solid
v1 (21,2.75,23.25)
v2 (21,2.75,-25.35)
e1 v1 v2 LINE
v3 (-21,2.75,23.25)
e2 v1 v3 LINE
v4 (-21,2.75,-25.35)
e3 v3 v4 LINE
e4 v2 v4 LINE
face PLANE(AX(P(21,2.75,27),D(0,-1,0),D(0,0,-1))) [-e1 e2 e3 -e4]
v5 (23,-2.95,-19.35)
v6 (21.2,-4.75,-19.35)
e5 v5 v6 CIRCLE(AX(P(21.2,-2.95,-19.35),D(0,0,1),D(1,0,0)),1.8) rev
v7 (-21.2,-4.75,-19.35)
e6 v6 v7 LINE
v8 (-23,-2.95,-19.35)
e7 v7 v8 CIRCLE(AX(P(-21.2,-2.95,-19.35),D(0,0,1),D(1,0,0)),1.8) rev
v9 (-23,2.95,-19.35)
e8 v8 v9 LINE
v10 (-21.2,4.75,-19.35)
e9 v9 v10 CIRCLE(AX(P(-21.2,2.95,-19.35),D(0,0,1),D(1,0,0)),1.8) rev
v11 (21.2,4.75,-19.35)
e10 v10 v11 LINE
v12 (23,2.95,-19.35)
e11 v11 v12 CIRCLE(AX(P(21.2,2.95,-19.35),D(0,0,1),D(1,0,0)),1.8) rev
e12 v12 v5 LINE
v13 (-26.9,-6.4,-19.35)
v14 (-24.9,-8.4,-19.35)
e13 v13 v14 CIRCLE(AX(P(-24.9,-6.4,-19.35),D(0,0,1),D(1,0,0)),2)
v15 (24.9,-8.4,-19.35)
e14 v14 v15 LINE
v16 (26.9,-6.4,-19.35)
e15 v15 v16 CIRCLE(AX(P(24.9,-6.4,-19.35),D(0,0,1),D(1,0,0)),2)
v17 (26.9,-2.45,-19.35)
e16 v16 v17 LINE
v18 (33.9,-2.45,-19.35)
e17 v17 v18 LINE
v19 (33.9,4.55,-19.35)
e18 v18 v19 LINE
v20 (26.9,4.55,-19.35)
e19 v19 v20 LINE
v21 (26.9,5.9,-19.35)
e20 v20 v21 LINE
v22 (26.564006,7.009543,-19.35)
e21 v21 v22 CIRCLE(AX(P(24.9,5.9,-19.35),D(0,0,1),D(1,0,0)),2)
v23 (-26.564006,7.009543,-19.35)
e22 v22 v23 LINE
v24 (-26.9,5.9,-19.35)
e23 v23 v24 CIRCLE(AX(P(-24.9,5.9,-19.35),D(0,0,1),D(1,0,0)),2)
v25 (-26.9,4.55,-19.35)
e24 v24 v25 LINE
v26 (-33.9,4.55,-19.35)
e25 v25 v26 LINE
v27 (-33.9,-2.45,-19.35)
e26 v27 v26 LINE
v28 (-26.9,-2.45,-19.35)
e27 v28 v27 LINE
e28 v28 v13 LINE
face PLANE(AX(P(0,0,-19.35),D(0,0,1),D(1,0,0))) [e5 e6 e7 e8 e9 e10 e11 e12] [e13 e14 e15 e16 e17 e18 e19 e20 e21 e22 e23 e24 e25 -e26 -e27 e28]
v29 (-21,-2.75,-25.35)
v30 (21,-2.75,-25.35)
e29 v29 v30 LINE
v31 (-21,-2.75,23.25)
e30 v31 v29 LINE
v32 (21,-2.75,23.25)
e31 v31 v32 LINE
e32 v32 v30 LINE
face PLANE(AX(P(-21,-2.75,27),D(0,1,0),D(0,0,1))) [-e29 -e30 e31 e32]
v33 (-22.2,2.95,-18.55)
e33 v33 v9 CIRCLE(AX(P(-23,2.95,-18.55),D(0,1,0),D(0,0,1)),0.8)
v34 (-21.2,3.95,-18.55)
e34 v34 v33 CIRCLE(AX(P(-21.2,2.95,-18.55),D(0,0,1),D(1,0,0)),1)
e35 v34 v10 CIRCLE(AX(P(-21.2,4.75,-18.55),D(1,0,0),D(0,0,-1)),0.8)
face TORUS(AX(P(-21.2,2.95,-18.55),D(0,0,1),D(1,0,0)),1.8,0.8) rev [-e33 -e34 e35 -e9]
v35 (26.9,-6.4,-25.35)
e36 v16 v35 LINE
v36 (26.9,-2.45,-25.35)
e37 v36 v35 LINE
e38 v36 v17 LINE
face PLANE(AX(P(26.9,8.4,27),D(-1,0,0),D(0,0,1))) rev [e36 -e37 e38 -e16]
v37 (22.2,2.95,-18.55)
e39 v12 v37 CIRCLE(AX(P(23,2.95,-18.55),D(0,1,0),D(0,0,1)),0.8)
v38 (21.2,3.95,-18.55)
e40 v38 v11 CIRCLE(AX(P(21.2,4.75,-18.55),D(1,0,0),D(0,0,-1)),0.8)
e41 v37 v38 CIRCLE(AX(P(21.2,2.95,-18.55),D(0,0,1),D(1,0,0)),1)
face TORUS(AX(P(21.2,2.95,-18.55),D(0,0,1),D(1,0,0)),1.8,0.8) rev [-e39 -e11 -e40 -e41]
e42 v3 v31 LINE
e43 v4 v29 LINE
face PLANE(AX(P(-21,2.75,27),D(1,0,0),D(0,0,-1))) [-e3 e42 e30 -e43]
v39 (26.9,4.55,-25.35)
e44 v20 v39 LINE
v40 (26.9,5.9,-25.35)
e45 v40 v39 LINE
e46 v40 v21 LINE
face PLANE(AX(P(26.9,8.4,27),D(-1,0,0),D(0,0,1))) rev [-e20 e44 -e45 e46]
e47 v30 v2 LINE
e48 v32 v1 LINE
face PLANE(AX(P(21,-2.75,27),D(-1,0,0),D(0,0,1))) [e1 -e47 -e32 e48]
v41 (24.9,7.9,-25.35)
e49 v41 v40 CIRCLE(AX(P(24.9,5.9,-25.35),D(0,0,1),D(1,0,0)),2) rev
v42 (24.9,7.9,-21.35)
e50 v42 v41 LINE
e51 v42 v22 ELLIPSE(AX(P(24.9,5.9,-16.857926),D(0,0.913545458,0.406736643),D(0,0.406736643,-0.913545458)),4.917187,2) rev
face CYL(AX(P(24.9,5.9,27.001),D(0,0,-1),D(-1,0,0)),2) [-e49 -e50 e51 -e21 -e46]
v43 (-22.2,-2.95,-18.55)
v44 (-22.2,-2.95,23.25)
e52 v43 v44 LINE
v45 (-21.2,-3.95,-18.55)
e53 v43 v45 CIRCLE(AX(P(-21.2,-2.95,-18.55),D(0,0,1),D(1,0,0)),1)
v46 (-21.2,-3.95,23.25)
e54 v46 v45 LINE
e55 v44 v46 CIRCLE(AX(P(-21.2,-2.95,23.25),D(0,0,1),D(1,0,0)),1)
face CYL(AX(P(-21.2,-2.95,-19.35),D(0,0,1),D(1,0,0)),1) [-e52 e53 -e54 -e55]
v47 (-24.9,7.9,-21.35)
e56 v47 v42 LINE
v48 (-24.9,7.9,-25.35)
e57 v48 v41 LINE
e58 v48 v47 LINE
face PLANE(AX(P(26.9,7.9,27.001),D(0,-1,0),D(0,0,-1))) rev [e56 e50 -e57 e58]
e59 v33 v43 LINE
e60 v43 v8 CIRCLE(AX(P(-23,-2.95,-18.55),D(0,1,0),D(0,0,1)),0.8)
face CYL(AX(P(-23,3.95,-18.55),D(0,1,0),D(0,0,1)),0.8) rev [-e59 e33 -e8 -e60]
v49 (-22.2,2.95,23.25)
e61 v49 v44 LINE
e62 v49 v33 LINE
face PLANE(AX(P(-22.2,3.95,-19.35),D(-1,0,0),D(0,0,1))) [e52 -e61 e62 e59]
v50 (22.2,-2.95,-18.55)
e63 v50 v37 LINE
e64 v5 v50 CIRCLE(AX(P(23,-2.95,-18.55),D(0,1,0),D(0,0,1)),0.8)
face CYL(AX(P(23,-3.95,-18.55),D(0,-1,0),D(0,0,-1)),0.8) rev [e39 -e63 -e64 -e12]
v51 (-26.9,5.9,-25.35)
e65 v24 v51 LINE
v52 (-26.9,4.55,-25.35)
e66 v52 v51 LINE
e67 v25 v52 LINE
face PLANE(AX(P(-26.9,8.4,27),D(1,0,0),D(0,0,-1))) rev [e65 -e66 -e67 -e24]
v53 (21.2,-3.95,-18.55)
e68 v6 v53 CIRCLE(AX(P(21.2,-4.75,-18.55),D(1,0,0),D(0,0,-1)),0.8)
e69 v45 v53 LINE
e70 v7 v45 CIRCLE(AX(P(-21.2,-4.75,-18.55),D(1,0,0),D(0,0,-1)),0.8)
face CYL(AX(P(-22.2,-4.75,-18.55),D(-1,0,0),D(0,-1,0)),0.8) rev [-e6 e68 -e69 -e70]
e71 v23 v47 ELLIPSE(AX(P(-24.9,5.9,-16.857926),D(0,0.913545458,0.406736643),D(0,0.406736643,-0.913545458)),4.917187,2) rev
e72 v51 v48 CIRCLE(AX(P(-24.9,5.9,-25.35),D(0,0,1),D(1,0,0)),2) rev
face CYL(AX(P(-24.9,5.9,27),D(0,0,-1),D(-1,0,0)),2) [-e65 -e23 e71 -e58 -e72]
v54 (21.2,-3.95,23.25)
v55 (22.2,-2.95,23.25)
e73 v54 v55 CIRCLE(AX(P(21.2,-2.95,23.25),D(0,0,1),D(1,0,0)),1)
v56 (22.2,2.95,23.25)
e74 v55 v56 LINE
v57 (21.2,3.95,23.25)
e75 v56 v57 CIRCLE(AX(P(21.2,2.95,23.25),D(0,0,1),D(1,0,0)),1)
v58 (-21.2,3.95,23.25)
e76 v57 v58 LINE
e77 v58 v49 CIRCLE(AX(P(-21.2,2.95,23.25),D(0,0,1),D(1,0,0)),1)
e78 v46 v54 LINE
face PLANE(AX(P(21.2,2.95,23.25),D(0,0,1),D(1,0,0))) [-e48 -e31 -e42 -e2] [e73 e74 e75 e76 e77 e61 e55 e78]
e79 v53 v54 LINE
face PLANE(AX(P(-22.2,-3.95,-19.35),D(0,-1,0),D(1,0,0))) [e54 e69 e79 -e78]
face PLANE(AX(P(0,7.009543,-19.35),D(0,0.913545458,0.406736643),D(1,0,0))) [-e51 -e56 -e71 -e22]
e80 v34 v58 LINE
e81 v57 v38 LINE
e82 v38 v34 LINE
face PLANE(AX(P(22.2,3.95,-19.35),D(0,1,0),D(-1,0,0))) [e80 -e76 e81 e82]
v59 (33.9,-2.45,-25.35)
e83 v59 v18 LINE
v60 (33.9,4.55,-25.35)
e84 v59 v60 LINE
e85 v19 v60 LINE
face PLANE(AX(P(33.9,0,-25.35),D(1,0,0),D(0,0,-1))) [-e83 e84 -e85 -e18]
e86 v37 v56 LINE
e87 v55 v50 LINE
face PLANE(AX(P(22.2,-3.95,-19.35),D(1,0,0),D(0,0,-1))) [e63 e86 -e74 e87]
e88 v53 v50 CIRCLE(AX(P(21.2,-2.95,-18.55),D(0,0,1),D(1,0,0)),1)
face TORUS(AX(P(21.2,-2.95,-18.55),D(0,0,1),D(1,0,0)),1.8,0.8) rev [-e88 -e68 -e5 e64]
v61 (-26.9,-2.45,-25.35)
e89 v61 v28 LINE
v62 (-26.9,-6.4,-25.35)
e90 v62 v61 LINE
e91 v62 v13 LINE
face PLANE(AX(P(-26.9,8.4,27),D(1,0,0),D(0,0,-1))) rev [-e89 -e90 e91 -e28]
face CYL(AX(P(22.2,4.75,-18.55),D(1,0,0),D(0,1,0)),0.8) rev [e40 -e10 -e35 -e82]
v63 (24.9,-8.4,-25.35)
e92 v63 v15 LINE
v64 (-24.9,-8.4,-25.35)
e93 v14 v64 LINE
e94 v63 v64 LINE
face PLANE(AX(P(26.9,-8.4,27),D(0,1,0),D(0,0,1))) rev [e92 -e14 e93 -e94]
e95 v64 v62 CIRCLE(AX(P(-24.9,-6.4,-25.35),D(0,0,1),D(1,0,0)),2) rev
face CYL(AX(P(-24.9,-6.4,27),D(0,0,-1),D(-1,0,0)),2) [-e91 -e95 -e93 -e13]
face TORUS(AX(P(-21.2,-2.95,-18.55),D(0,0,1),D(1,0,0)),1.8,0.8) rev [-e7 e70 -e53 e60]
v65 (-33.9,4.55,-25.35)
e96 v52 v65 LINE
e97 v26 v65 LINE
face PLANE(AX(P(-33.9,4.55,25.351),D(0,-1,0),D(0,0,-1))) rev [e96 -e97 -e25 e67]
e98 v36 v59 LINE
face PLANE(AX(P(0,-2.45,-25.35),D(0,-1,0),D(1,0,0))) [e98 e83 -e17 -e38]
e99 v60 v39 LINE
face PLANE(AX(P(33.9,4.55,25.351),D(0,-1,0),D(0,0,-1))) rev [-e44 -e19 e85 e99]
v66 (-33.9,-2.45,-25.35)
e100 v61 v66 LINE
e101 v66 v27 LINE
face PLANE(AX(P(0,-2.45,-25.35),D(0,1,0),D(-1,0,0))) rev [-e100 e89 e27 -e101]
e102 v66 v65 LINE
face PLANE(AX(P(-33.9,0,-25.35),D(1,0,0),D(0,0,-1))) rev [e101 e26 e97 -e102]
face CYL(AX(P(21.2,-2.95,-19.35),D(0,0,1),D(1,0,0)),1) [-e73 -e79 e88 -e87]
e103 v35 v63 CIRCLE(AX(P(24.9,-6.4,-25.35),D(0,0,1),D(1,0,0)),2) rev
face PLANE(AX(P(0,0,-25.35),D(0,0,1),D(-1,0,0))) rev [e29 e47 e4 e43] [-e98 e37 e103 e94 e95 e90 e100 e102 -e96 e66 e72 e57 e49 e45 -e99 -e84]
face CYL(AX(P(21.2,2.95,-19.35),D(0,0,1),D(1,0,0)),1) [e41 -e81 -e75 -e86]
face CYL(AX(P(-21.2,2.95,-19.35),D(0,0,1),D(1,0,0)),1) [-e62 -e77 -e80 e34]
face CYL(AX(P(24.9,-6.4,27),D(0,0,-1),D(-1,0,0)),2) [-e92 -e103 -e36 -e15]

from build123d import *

# Parameters (mm, degrees)
SKETCH1_W           = 53.8
SKETCH1_H           = 16.8
SKETCH1_W_2         = 42
SKETCH1_H_2         = 5.5
BOSS_EXTRUDE1_DEPTH = 27
SKETCH4_W           = 53.8
SKETCH4_H           = 16.8
SKETCH4_W_2         = 44.4
SKETCH4_H_2         = 7.9
CUT_EXTRUDE2_DEPTH  = 19.35
SKETCH2_W           = 7
SKETCH2_H           = 10
BOSS_EXTRUDE2_DEPTH = 6
SKETCH3_R           = 1.35
CUT_EXTRUDE1_DEPTH  = 8
CUT_EXTRUDE4_REACH  = 66.31
SKETCH7_W           = 53.8
SKETCH7_H           = 0.5
FILLET2_R           = 1
FILETE1_R           = 2
SKETCH5_W           = 53.8
SKETCH5_H           = 16.8
CUT_EXTRUDE3_DEPTH  = 1.65
CUT_EXTRUDE5_REACH  = 63.565
CUT_EXTRUDE6_REACH  = 64.931
BOSS_EXTRUDE3_START = -7
SKETCH10_R          = 1.35
BOSS_EXTRUDE3_DEPTH = 7
CUT_EXTRUDE7_DEPTH  = 1.65
SKETCH13_W          = 6
SKETCH13_H          = 16.8
CUT_EXTRUDE8_DEPTH  = 73.869901194
FILLET6_R           = 0.8
BOSS_EXTRUDE4_START = 3.9
SKETCH14_W          = 42
SKETCH14_H          = 5.5
BOSS_EXTRUDE4_DEPTH = 3.9


with BuildPart() as part:
    # Sketch1 → Boss-Extrude1 (new, symmetric)
    with BuildSketch(Plane.XY):
        Rectangle(SKETCH1_W, SKETCH1_H)
        Rectangle(SKETCH1_W_2, SKETCH1_H_2, mode=Mode.SUBTRACT)
    extrude(amount=BOSS_EXTRUDE1_DEPTH, both=True)

    # Sketch4 → Cut-Extrude2 (cut, symmetric)
    with BuildSketch(Plane.XY):
        Rectangle(SKETCH4_W, SKETCH4_H)
        Rectangle(SKETCH4_W_2, SKETCH4_H_2, mode=Mode.SUBTRACT)
    extrude(amount=CUT_EXTRUDE2_DEPTH, both=True, mode=Mode.SUBTRACT)

    # Sketch2 → Boss-Extrude2 (add)
    with BuildSketch(Plane(origin=(0, 0, 19.35), x_dir=(-1, 0, 0), z_dir=(0, 0, -1))):
        with Locations((-30.4, 2.55)):
            Rectangle(SKETCH2_W, SKETCH2_H)
        with Locations((30.4, 2.55)):
            Rectangle(SKETCH2_W, SKETCH2_H)
    boss_extrude2 = extrude(amount=-BOSS_EXTRUDE2_DEPTH)

    # Sketch3 → Cut-Extrude1 (cut)
    with BuildSketch(Plane.XZ.offset(2.45)):
        with Locations((-30.9, 22.35)):
            Circle(SKETCH3_R)
        with Locations((30.9, 22.35)):
            Circle(SKETCH3_R)
    cut_extrude1 = extrude(amount=-CUT_EXTRUDE1_DEPTH, mode=Mode.SUBTRACT)

    # Mirror8: Boss-Extrude2, Cut-Extrude1 across plane
    add(boss_extrude2.mirror(Plane.XY))
    add(cut_extrude1.mirror(Plane.XY), mode=Mode.SUBTRACT)

    # Sketch7 → Cut-Extrude4 (cut, up to next)
    with BuildSketch(Plane(origin=(0, 0, -27), x_dir=(-1, 0, 0), z_dir=(0, 0, -1)), mode=Mode.PRIVATE) as cut_extrude4_sk1:
        with Locations((0, 8.15)):
            Rectangle(SKETCH7_W, SKETCH7_H)
    cut_extrude4_tool1 = extrude(cut_extrude4_sk1.sketch, amount=-CUT_EXTRUDE4_REACH, mode=Mode.PRIVATE) & part.part
    add(cut_extrude4_tool1.solids().sort_by_distance((0, 8.15, -27))[0], mode=Mode.SUBTRACT)

    # Fillet2
    fillet2_edges = [part.edges().sort_by_distance(p)[0] for p in [
        (-22.2, -3.95, 0),
        (-22.2, 3.95, 0),
        (22.2, 3.95, 0),
        (22.2, -3.95, 0),
    ]]
    fillet(fillet2_edges, radius=FILLET2_R)

    # Filete1
    filete1_edges = [part.edges().sort_by_distance(p)[0] for p in [
        (-26.9, -8.4, -23.175),
        (26.9, -8.4, -23.175),
        (26.9, -8.4, 23.175),
        (-26.9, -8.4, 23.175),
        (26.9, 8.4, 23.175),
        (-26.9, 8.4, 23.175),
        (-26.9, 7.9, -23.175),
        (26.9, 7.9, -23.175),
    ]]
    fillet(filete1_edges, radius=FILETE1_R)

    # Sketch5 → Cut-Extrude3 (cut)
    with BuildSketch(Plane.XY.offset(27)):
        Rectangle(SKETCH5_W, SKETCH5_H)
    extrude(amount=-CUT_EXTRUDE3_DEPTH, mode=Mode.SUBTRACT)

    # Chamfer1
    # the kernel refuses this chamfer: 2, 0.890457371 mm, written as the material it takes off along each edge
    with BuildSketch(Plane(origin=(-37.34003391, 7.9, -19.35), x_dir=(0, -0.9968798599783938, 0.07893379991776824), z_dir=(1, 0, 0))) as chamfer1_piece_1:
        with BuildLine():
            Line((0.925885194, 0), (-0.196073774, 2.064046904))
            Line((-0.196073774, 2.064046904), (-0.235948969, 2.060889552))
            ThreePointArc((-0.235948969, 2.060889552), (-0.121693379, 1.030150311), (-0.039875194, -0.003157352))
            Line((-0.039875194, -0.003157352), (0.003157352, -0.039875194))
            ThreePointArc((0.003157352, -0.039875194), (0.463215564, -0.003447392), (0.929042546, -0.039875194))
            Line((0.929042546, -0.039875194), (0.925885194, 0))
        make_face()
    extrude(amount=74.680067819, mode=Mode.SUBTRACT)

    # Sketch8 → Cut-Extrude5 (cut, up to next)
    with BuildSketch(Plane(origin=(0, 0, -25.35), x_dir=(-1, 0, 0), z_dir=(0, 0, -1)), mode=Mode.PRIVATE) as cut_extrude5_sk1:
        with BuildLine():
            Line((-26.030265456, 7.55), (-33.9, 7.55))
            Line((-33.9, 7.55), (-33.9, 4.55))
            Line((-33.9, 4.55), (-26.9, 4.55))
            Line((-26.9, 4.55), (-26.9, 5.9))
            ThreePointArc((-26.9, 5.9), (-26.669255622, 6.832595595), (-26.030265456, 7.55))
        make_face()
    cut_extrude5_tool1 = extrude(cut_extrude5_sk1.sketch, amount=-CUT_EXTRUDE5_REACH, mode=Mode.PRIVATE) & part.part
    # Sketch8 → Cut-Extrude5 (cut, up to next)
    with BuildSketch(Plane(origin=(0, 0, -25.35), x_dir=(-1, 0, 0), z_dir=(0, 0, -1)), mode=Mode.PRIVATE) as cut_extrude5_sk2:
        with BuildLine():
            Line((26.9, 4.55), (26.9, 5.9))
            ThreePointArc((26.9, 5.9), (26.669255622, 6.832595595), (26.030265456, 7.55))
            Line((26.030265456, 7.55), (33.9, 7.55))
            Line((33.9, 7.55), (33.9, 4.55))
            Line((33.9, 4.55), (26.9, 4.55))
        make_face()
    cut_extrude5_tool2 = extrude(cut_extrude5_sk2.sketch, amount=-CUT_EXTRUDE5_REACH, mode=Mode.PRIVATE) & part.part
    add(cut_extrude5_tool1.solids().sort_by_distance((30.325305, 6.072078, -25.35))[0], mode=Mode.SUBTRACT)
    add(cut_extrude5_tool2.solids().sort_by_distance((-30.325305, 6.072078, -25.35))[0], mode=Mode.SUBTRACT)

    # Sketch9 → Cut-Extrude6 (cut, up to next)
    with BuildSketch(Plane.XY.offset(25.35), mode=Mode.PRIVATE) as cut_extrude6_sk1:
        Polygon((26.9, 5.9), (26.9, 7.55), (33.9, 7.55), (33.9, 4.55), (26.9, 4.55), align=None)
    cut_extrude6_tool1 = extrude(cut_extrude6_sk1.sketch, amount=-CUT_EXTRUDE6_REACH, mode=Mode.PRIVATE) & part.part
    # Sketch9 → Cut-Extrude6 (cut, up to next)
    with BuildSketch(Plane.XY.offset(25.35), mode=Mode.PRIVATE) as cut_extrude6_sk2:
        Polygon((-26.9, 5.9), (-26.9, 4.55), (-33.9, 4.55), (-33.9, 7.55), (-26.9, 7.55), align=None)
    cut_extrude6_tool2 = extrude(cut_extrude6_sk2.sketch, amount=-CUT_EXTRUDE6_REACH, mode=Mode.PRIVATE) & part.part
    add(cut_extrude6_tool1.solids().sort_by_distance((30.4, 6.05, 25.35))[0], mode=Mode.SUBTRACT)
    add(cut_extrude6_tool2.solids().sort_by_distance((-30.4, 6.05, 25.35))[0], mode=Mode.SUBTRACT)

    # Sketch10 → Boss-Extrude3 (add)
    with BuildSketch(Plane(origin=(0, 4.55, 0), x_dir=(1, 0, 0), z_dir=(0, 1, 0)).offset(BOSS_EXTRUDE3_START)):
        with Locations((30.9, -22.35)):
            Circle(SKETCH10_R)
        with Locations((-30.9, -22.35)):
            Circle(SKETCH10_R)
    boss_extrude3 = extrude(amount=BOSS_EXTRUDE3_DEPTH)

    # Mirror9: Boss-Extrude3 across plane
    add(boss_extrude3.mirror(Plane.XY))

    # Sketch11 → Cut-Extrude7 (cut)
    with BuildSketch(Plane(origin=(0, 0, -27), x_dir=(-1, 0, 0), z_dir=(0, 0, -1))):
        with BuildLine():
            Line((26.9, -6.4), (26.9, 5.9))
            ThreePointArc((26.9, 5.9), (26.314213562, 7.314213562), (24.9, 7.9))
            Line((24.9, 7.9), (-24.9, 7.9))
            ThreePointArc((-24.9, 7.9), (-26.314213562, 7.314213562), (-26.9, 5.9))
            Line((-26.9, 5.9), (-26.9, -6.4))
            ThreePointArc((-26.9, -6.4), (-26.314213562, -7.814213562), (-24.9, -8.4))
            Line((-24.9, -8.4), (24.9, -8.4))
            ThreePointArc((24.9, -8.4), (26.314213562, -7.814213562), (26.9, -6.4))
        make_face()
    extrude(amount=-CUT_EXTRUDE7_DEPTH, mode=Mode.SUBTRACT)

    # Sketch13 → Cut-Extrude8 (cut, through all)
    with BuildSketch(Plane.ZY.offset(33.9)):
        with Locations((22.35, 0)):
            Rectangle(SKETCH13_W, SKETCH13_H)
    extrude(amount=-CUT_EXTRUDE8_DEPTH, mode=Mode.SUBTRACT)

    # Fillet6
    fillet6_edges = [part.edges().sort_by_distance(p)[0] for p in [
        (-22.2, 0, -19.35),
        (0, -3.95, -19.35),
        (22.2, 0, -19.35),
        (0, 3.95, -19.35),
        (-21.907106781, -3.657106781, -19.35),
        (21.907106781, -3.657106781, -19.35),
        (21.907106781, 3.657106781, -19.35),
        (-21.907106781, 3.657106781, -19.35),
    ]]
    fillet(fillet6_edges, radius=FILLET6_R)

    # Sketch14 → Boss-Extrude4 (add)
    with BuildSketch(Plane.XY.offset(19.35).offset(BOSS_EXTRUDE4_START)):
        with BuildLine():
            Line((22.2, -2.95), (22.2, 2.95))
            ThreePointArc((22.2, 2.95), (21.907106781, 3.657106781), (21.2, 3.95))
            Line((21.2, 3.95), (-21.2, 3.95))
            ThreePointArc((-21.2, 3.95), (-21.907106781, 3.657106781), (-22.2, 2.95))
            Line((-22.2, 2.95), (-22.2, -2.95))
            ThreePointArc((-22.2, -2.95), (-21.907106781, -3.657106781), (-21.2, -3.95))
            Line((-21.2, -3.95), (21.2, -3.95))
            ThreePointArc((21.2, -3.95), (21.907106781, -3.657106781), (22.2, -2.95))
        make_face()
        Rectangle(SKETCH14_W, SKETCH14_H, mode=Mode.SUBTRACT)
    extrude(amount=-BOSS_EXTRUDE4_DEPTH)


solid = part.part
